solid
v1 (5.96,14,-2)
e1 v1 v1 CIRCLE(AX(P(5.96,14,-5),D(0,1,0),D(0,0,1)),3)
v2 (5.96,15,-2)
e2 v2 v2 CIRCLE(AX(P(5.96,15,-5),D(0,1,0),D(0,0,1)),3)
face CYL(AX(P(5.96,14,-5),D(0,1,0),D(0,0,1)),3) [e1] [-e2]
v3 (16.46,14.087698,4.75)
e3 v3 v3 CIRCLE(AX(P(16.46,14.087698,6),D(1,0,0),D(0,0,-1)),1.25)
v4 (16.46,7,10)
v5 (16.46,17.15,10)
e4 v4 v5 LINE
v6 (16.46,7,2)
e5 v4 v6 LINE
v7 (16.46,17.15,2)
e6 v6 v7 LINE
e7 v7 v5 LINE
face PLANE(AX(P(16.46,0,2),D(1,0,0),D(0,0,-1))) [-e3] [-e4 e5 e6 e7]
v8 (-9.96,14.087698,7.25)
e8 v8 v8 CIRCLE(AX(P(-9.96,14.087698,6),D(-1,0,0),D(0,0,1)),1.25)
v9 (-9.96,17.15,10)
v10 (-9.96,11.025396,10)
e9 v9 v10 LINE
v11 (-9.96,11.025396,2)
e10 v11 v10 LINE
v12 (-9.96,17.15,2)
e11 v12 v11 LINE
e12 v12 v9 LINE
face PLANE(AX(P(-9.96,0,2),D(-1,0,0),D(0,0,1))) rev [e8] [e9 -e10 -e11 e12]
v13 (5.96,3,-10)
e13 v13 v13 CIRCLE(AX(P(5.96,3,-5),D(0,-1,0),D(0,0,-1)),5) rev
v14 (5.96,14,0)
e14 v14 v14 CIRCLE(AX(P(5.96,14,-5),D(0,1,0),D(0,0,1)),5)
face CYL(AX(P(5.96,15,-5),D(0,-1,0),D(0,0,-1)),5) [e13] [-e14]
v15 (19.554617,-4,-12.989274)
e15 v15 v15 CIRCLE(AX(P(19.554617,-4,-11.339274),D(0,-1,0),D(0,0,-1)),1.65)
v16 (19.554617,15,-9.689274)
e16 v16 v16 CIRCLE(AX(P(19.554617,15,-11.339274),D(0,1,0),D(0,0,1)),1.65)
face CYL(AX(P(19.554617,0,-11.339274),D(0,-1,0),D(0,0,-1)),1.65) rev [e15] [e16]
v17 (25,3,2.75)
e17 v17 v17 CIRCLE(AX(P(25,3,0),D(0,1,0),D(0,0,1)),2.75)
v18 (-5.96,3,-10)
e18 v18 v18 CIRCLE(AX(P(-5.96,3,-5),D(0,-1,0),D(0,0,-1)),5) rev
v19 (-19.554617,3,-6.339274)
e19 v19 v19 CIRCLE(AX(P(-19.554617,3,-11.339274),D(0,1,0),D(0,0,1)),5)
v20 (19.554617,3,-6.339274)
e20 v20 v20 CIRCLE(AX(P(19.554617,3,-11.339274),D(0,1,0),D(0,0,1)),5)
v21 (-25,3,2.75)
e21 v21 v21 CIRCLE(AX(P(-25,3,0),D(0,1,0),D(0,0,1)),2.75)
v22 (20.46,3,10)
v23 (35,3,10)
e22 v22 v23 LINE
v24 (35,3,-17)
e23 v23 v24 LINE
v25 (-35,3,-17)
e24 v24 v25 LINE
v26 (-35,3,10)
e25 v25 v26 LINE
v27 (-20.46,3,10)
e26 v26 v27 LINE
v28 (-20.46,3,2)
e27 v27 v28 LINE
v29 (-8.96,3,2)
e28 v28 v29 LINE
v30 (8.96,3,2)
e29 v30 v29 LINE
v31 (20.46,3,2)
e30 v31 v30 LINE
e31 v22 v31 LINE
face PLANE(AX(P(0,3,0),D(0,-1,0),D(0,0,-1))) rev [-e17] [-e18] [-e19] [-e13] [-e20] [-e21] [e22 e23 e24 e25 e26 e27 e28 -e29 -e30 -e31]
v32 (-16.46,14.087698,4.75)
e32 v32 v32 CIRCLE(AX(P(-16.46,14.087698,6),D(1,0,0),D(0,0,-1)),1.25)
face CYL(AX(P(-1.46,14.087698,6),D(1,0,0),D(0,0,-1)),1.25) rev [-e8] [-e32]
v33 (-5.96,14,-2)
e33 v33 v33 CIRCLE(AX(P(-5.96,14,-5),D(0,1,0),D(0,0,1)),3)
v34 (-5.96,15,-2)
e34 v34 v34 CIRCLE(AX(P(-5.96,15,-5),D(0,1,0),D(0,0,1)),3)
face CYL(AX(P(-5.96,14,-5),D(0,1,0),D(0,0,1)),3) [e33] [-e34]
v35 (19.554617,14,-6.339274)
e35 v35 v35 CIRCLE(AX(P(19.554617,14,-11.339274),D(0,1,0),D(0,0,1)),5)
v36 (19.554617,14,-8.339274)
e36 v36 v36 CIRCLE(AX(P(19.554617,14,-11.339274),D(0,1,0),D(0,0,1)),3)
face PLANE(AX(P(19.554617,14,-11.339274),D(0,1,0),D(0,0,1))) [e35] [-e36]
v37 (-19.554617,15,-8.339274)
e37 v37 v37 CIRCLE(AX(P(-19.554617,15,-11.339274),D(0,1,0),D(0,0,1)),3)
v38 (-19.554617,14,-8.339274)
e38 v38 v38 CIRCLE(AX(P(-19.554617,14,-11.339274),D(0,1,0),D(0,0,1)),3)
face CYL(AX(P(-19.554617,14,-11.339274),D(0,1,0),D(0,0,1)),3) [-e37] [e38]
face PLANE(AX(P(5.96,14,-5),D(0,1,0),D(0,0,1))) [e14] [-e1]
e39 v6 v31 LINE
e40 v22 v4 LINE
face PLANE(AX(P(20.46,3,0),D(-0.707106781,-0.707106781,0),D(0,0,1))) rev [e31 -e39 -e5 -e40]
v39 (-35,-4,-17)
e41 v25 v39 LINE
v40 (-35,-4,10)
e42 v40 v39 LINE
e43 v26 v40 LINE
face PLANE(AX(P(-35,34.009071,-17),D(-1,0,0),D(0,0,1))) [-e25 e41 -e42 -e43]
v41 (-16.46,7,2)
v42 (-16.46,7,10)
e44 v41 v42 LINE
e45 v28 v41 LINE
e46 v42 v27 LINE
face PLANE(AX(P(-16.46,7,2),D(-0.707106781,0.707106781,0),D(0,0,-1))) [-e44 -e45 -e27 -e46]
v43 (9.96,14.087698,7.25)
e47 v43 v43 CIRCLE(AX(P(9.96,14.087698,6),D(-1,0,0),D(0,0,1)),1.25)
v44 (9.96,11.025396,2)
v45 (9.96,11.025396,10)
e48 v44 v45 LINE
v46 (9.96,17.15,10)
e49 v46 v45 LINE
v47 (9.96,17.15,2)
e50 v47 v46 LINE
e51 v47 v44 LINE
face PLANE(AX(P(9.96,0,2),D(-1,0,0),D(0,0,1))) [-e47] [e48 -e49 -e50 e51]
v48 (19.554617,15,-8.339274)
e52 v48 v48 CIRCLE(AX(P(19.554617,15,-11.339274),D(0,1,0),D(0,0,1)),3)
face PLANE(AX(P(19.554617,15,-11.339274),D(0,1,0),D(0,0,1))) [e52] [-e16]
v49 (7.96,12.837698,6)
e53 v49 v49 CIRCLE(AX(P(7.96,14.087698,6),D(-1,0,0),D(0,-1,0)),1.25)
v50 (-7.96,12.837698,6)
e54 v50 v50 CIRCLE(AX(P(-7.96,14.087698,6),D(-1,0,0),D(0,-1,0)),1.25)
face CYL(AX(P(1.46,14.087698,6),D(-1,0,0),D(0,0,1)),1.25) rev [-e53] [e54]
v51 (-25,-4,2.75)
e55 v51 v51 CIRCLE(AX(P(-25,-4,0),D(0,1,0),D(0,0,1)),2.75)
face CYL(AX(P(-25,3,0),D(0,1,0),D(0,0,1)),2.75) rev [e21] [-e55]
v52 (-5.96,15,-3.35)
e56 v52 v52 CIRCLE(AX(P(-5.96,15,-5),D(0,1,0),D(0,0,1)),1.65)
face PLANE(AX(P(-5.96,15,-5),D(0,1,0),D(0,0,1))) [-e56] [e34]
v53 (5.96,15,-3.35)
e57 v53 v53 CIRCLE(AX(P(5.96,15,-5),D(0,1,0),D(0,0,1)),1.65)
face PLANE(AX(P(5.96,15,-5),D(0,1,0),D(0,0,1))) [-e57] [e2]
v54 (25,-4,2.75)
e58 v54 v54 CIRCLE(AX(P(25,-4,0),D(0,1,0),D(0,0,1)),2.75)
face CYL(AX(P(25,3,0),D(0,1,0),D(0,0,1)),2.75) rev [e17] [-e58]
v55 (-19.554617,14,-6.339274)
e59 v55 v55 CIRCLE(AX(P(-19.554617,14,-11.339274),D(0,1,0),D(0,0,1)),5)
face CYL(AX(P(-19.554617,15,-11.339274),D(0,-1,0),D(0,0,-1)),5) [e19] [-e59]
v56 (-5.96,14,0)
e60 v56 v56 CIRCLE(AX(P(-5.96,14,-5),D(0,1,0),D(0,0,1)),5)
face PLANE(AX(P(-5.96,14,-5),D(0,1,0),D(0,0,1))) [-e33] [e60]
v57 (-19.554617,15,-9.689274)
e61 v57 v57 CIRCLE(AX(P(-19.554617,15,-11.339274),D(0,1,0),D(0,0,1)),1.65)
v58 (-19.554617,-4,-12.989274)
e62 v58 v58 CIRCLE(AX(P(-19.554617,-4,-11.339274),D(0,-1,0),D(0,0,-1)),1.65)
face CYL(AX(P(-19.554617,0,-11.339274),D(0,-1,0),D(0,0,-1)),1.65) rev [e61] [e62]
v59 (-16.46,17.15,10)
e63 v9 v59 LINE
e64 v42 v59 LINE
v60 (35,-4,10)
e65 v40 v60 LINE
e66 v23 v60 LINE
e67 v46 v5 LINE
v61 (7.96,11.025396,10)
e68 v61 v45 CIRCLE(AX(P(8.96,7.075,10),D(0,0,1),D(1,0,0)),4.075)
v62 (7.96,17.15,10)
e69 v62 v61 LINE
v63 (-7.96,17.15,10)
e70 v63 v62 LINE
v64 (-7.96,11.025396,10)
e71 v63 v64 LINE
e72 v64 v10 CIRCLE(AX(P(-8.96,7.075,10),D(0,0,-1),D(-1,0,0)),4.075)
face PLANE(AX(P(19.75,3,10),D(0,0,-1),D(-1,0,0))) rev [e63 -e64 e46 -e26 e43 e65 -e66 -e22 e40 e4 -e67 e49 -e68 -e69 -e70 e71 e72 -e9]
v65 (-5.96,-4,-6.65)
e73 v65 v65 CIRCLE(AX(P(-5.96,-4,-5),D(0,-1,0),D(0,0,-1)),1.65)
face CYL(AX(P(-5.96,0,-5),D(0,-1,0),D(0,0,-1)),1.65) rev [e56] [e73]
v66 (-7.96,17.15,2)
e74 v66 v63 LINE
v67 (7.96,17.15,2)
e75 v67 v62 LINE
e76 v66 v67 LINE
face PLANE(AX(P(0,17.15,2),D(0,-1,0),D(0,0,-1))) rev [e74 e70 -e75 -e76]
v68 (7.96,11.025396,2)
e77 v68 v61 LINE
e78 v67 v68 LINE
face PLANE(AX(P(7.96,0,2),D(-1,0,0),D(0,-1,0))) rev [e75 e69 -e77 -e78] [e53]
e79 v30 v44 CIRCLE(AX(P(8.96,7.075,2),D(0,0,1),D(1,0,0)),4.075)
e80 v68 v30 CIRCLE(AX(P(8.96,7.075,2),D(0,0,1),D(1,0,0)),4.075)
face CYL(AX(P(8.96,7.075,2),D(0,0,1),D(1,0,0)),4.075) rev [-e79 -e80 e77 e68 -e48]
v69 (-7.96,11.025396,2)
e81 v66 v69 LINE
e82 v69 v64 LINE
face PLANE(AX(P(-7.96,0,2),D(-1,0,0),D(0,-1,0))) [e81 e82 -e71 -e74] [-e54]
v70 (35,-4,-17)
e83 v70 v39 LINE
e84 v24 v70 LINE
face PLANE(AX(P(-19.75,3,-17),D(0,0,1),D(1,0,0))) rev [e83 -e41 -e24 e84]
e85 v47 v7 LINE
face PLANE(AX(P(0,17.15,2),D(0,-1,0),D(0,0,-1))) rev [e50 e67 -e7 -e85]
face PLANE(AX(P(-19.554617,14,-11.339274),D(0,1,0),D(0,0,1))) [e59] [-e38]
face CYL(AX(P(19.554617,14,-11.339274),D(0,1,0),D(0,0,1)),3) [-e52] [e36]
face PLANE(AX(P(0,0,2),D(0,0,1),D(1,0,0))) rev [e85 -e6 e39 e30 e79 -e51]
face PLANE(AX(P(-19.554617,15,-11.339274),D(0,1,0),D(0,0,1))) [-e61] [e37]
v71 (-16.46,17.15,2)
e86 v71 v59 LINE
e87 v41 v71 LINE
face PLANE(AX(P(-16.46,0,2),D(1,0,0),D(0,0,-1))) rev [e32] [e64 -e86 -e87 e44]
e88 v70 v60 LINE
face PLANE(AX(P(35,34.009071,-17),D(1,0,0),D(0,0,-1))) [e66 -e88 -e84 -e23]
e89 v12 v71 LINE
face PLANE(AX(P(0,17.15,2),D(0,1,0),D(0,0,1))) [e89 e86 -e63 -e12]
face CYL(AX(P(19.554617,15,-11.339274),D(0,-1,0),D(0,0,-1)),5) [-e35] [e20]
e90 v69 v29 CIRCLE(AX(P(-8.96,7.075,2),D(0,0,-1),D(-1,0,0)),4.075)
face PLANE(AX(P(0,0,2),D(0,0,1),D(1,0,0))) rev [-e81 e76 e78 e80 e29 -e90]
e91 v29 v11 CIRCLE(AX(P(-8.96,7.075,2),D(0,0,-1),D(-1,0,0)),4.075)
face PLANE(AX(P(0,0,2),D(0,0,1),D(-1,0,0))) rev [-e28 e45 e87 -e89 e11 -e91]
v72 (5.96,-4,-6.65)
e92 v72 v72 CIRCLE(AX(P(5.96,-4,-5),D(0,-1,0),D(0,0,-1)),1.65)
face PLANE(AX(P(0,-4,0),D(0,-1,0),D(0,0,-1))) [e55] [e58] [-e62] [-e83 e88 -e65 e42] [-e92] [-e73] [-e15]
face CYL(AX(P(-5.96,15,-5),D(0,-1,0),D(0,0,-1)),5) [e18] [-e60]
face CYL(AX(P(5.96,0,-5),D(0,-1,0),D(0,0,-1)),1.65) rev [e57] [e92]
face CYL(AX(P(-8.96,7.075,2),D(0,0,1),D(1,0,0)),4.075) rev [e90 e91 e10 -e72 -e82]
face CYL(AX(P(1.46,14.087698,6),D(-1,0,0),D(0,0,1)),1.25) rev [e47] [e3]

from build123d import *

# Parameters (mm, degrees)
BOSS_EXTRUDE1_DEPTH      = 3
BOSS_EXTRUDE2_DEPTH      = 8
CHAMFER1_SIZE            = 4
M3X0_5_TAPPED_HOLE1_D    = 2.5
CHAMFER1_OF_MIRROR1_SIZE = 4
BOSS_EXTRUDE3_REACH      = 34.14
SKETCH7_W                = 8
SKETCH7_H                = 14.15
SKETCH7_R                = 1.25
SKETCH8_R                = 5
BOSS_EXTRUDE4_DEPTH      = 12
CUT_EXTRUDE1_START       = -1
SKETCH9_R                = 5
SKETCH9_R_2              = 3
CUT_EXTRUDE1_DEPTH       = 1
SKETCH12_W               = 15.25
SKETCH12_H               = 27
BOSS_EXTRUDE5_DEPTH      = 3
M4X0_7_TAPPED_HOLE1_D    = 3.3
M5_CLEARANCE_HOLE3_D     = 5.5
DELETEFACE1_START        = 2
DELETEFACE1_DEPTH        = 8
MOVE_FACE1_BY            = 4


# Read off the part's stored shape, not the designer's step: DeleteFace1
with BuildPart() as part:
    # Sketch1 → Boss-Extrude1 (new body)
    with BuildSketch(Plane(origin=(0, 0, 0), x_dir=(1, 0, 0), z_dir=(0, 1, 0))):
        Polygon((19.75, 10), (19.75, -10), (-19.75, -10), (-19.75, 10), (-19.75, 17), (19.75, 17), align=None)
    extrude(amount=BOSS_EXTRUDE1_DEPTH)

    # Sketch4 → Boss-Extrude2 (add)
    with BuildSketch(Plane.XY.offset(10)):
        with BuildLine():
            Line((1.46, 17.15), (1.46, 3))
            Line((1.46, 3), (8.960000005, 3))
            ThreePointArc((8.960000005, 3), (4.916271098, 6.571133381), (7.96, 11.02539555))
            Line((7.96, 11.02539555), (7.96, 17.15))
            Line((7.96, 17.15), (1.46, 17.15))
        make_face()
        with BuildLine():
            ThreePointArc((13.035, 7.075), (11.841460135, 4.193539869), (8.960000005, 3))
            Line((8.960000005, 3), (16.46, 3))
            Line((16.46, 3), (16.46, 17.15))
            Line((16.46, 17.15), (9.96, 17.15))
            Line((9.96, 17.15), (9.96, 11.02539555))
            ThreePointArc((9.96, 11.02539555), (12.175635629, 9.578060627), (13.035, 7.075))
        make_face()
    boss_extrude2 = extrude(amount=-BOSS_EXTRUDE2_DEPTH)

    # Chamfer1
    # the kernel refuses this chamfer: 4 mm, written as the material it adds along each edge
    with BuildSketch(Plane(origin=(16.46, 3, 10), x_dir=(0.9996219169112968, -0.027495876610586917, 0), z_dir=(0, 0, -1))) as chamfer1_piece_1_section:
        Polygon((CHAMFER1_SIZE * 0.999621916911, -CHAMFER1_SIZE * 0.0274958766106), (-CHAMFER1_SIZE * 0.0274958766106, -CHAMFER1_SIZE * 0.999621916911), (0, 0), align=None)
    chamfer1_piece_1 = extrude(amount=8, mode=Mode.PRIVATE)
    chamfer1_piece_1 = split(chamfer1_piece_1, bisect_by=Plane(origin=(19.75, 4.372732245, 6), z_dir=(-1, 0, 0)), keep=Keep.TOP, mode=Mode.PRIVATE)
    add(chamfer1_piece_1)

    # M3x0.5 Tapped Hole1 (through all)
    with Locations(Plane.ZY.offset(-1.46)):
        with Locations((6, 14.087697775)):
            m3x0_5_tapped_hole1 = Hole(M3X0_5_TAPPED_HOLE1_D / 2)

    # Mirror1: Boss-Extrude2, M3x0.5 Tapped Hole1 across plane
    add(boss_extrude2.mirror(Plane(origin=(0, 0, 0), x_dir=(0, 0, 1), z_dir=(1, 0, 0))))
    add(m3x0_5_tapped_hole1.mirror(Plane(origin=(0, 0, 0), x_dir=(0, 0, 1), z_dir=(1, 0, 0))), mode=Mode.SUBTRACT)

    # Chamfer1 of Mirror1
    # the kernel refuses this chamfer: 4 mm, written as the material it adds along each edge
    with BuildSketch(Plane(origin=(-16.46, 3, 10), x_dir=(-0.9996219169112968, -0.027495876610586917, 0), z_dir=(0, 0, -1))) as chamfer1_of_mirror1_piece_1_section:
        Polygon((CHAMFER1_OF_MIRROR1_SIZE * 0.999621916911, CHAMFER1_OF_MIRROR1_SIZE * 0.0274958766106), (-CHAMFER1_OF_MIRROR1_SIZE * 0.0274958766106, CHAMFER1_OF_MIRROR1_SIZE * 0.999621916911), (0, 0), align=None)
    chamfer1_of_mirror1_piece_1 = extrude(amount=8, mode=Mode.PRIVATE)
    chamfer1_of_mirror1_piece_1 = split(chamfer1_of_mirror1_piece_1, bisect_by=Plane(origin=(-19.75, 4.372732245, 6), z_dir=(1, 0, 0)), keep=Keep.TOP, mode=Mode.PRIVATE)
    add(chamfer1_of_mirror1_piece_1)

    # Sketch7 → Boss-Extrude3 (add, up to next)
    with BuildSketch(Plane(origin=(-1.46, 0, 0), x_dir=(0, 0, -1), z_dir=(1, 0, 0)), mode=Mode.PRIVATE) as boss_extrude3_sk1:
        with Locations((-6, 10.075)):
            Rectangle(SKETCH7_W, SKETCH7_H)
        with Locations(Location((-6, 14.087697775, 0), (0, 0, 180))):
            Circle(SKETCH7_R, mode=Mode.SUBTRACT)
    boss_extrude3_tool1 = extrude(boss_extrude3_sk1.sketch, amount=BOSS_EXTRUDE3_REACH, mode=Mode.PRIVATE) - part.part
    add(boss_extrude3_tool1.solids().sort_by_distance((-1.46, 9.893108, 6))[0])

    # Sketch8 → Boss-Extrude4 (add)
    with BuildSketch(Plane(origin=(0, 3, 0), x_dir=(1, 0, 0), z_dir=(0, 1, 0))):
        with Locations(Location((-5.96, 5, 0), (0, 0, 90))):
            Circle(SKETCH8_R)
        with Locations(Location((5.96, 5, 0), (0, 0, 90))):
            Circle(SKETCH8_R)
        with Locations(Location((-19.554616806, 11.339273926, 0), (0, 0, 92.239496679))):
            Circle(SKETCH8_R)
        with Locations(Location((19.554616806, 11.339273926, 0), (0, 0, 87.760503321))):
            Circle(SKETCH8_R)
    extrude(amount=BOSS_EXTRUDE4_DEPTH)

    # Sketch9 → Cut-Extrude1 (cut)
    # profile 1 of 4: a face of its own
    with BuildSketch(Plane(origin=(0, 15, 0), x_dir=(1, 0, 0), z_dir=(0, 1, 0)).offset(CUT_EXTRUDE1_START)):
        with Locations(Location((5.96, 5, 0), (0, 0, 90))):
            Circle(SKETCH9_R)
        with Locations(Location((5.96, 5, 0), (0, 0, 270))):
            Circle(SKETCH9_R_2, mode=Mode.SUBTRACT)
    # profile 2 of 4: a face of its own
    with BuildSketch(Plane(origin=(0, 15, 0), x_dir=(1, 0, 0), z_dir=(0, 1, 0)).offset(CUT_EXTRUDE1_START)):
        with Locations(Location((-5.96, 5, 0), (0, 0, 90))):
            Circle(SKETCH9_R)
        with Locations(Location((-5.96, 5, 0), (0, 0, 270))):
            Circle(SKETCH9_R_2, mode=Mode.SUBTRACT)
    # profile 3 of 4: a face of its own
    with BuildSketch(Plane(origin=(0, 15, 0), x_dir=(1, 0, 0), z_dir=(0, 1, 0)).offset(CUT_EXTRUDE1_START)):
        with Locations(Location((-19.554616806, 11.339273926, 0), (0, 0, 92.239496679))):
            Circle(SKETCH9_R)
        with Locations(Location((-19.554616806, 11.339273926, 0), (0, 0, 270))):
            Circle(SKETCH9_R_2, mode=Mode.SUBTRACT)
    # profile 4 of 4: a face of its own
    with BuildSketch(Plane(origin=(0, 15, 0), x_dir=(1, 0, 0), z_dir=(0, 1, 0)).offset(CUT_EXTRUDE1_START)):
        with Locations(Location((19.554616806, 11.339273926, 0), (0, 0, 87.760503321))):
            Circle(SKETCH9_R)
        with Locations(Location((19.554616806, 11.339273926, 0), (0, 0, 270))):
            Circle(SKETCH9_R_2, mode=Mode.SUBTRACT)
    extrude(amount=CUT_EXTRUDE1_DEPTH, mode=Mode.SUBTRACT)

    # Sketch12 → Boss-Extrude5 (add)
    with BuildSketch(Plane.XZ):
        with Locations((-27.375, -3.5)):
            Rectangle(SKETCH12_W, SKETCH12_H)
        with Locations((27.375, -3.5)):
            Rectangle(SKETCH12_W, SKETCH12_H)
    extrude(amount=-BOSS_EXTRUDE5_DEPTH)

    # M4x0.7 Tapped Hole1 (through all)
    with Locations(Plane.XZ):
        with Locations((-5.96, -5), (5.96, -5), (-19.554616806, -11.339273926), (19.554616806, -11.339273926)):
            Hole(M4X0_7_TAPPED_HOLE1_D / 2)

    # M5 Clearance Hole3 (through all)
    with Locations(Plane(origin=(0, 3, 0), x_dir=(1, 0, 0), z_dir=(0, 1, 0))):
        with Locations((25, 0), (-25, 0)):
            Hole(M5_CLEARANCE_HOLE3_D / 2)

    # DeleteFace1 outline → DeleteFace1 (add)
    with BuildSketch(Plane.XY.offset(DELETEFACE1_START)):
        Polygon((-20.46, 3), (-19.75, 3), (-19.75, 3.71), align=None)
        Polygon((20.46, 3), (19.75, 3.71), (19.75, 3), align=None)
    extrude(amount=DELETEFACE1_DEPTH)

    # Move Face1: a face moved outward by 4.0
    extrude(part.faces().sort_by_distance((0, 0, -3.503622632))[0], amount=MOVE_FACE1_BY, dir=(0, -1, 0))


solid = part.part
